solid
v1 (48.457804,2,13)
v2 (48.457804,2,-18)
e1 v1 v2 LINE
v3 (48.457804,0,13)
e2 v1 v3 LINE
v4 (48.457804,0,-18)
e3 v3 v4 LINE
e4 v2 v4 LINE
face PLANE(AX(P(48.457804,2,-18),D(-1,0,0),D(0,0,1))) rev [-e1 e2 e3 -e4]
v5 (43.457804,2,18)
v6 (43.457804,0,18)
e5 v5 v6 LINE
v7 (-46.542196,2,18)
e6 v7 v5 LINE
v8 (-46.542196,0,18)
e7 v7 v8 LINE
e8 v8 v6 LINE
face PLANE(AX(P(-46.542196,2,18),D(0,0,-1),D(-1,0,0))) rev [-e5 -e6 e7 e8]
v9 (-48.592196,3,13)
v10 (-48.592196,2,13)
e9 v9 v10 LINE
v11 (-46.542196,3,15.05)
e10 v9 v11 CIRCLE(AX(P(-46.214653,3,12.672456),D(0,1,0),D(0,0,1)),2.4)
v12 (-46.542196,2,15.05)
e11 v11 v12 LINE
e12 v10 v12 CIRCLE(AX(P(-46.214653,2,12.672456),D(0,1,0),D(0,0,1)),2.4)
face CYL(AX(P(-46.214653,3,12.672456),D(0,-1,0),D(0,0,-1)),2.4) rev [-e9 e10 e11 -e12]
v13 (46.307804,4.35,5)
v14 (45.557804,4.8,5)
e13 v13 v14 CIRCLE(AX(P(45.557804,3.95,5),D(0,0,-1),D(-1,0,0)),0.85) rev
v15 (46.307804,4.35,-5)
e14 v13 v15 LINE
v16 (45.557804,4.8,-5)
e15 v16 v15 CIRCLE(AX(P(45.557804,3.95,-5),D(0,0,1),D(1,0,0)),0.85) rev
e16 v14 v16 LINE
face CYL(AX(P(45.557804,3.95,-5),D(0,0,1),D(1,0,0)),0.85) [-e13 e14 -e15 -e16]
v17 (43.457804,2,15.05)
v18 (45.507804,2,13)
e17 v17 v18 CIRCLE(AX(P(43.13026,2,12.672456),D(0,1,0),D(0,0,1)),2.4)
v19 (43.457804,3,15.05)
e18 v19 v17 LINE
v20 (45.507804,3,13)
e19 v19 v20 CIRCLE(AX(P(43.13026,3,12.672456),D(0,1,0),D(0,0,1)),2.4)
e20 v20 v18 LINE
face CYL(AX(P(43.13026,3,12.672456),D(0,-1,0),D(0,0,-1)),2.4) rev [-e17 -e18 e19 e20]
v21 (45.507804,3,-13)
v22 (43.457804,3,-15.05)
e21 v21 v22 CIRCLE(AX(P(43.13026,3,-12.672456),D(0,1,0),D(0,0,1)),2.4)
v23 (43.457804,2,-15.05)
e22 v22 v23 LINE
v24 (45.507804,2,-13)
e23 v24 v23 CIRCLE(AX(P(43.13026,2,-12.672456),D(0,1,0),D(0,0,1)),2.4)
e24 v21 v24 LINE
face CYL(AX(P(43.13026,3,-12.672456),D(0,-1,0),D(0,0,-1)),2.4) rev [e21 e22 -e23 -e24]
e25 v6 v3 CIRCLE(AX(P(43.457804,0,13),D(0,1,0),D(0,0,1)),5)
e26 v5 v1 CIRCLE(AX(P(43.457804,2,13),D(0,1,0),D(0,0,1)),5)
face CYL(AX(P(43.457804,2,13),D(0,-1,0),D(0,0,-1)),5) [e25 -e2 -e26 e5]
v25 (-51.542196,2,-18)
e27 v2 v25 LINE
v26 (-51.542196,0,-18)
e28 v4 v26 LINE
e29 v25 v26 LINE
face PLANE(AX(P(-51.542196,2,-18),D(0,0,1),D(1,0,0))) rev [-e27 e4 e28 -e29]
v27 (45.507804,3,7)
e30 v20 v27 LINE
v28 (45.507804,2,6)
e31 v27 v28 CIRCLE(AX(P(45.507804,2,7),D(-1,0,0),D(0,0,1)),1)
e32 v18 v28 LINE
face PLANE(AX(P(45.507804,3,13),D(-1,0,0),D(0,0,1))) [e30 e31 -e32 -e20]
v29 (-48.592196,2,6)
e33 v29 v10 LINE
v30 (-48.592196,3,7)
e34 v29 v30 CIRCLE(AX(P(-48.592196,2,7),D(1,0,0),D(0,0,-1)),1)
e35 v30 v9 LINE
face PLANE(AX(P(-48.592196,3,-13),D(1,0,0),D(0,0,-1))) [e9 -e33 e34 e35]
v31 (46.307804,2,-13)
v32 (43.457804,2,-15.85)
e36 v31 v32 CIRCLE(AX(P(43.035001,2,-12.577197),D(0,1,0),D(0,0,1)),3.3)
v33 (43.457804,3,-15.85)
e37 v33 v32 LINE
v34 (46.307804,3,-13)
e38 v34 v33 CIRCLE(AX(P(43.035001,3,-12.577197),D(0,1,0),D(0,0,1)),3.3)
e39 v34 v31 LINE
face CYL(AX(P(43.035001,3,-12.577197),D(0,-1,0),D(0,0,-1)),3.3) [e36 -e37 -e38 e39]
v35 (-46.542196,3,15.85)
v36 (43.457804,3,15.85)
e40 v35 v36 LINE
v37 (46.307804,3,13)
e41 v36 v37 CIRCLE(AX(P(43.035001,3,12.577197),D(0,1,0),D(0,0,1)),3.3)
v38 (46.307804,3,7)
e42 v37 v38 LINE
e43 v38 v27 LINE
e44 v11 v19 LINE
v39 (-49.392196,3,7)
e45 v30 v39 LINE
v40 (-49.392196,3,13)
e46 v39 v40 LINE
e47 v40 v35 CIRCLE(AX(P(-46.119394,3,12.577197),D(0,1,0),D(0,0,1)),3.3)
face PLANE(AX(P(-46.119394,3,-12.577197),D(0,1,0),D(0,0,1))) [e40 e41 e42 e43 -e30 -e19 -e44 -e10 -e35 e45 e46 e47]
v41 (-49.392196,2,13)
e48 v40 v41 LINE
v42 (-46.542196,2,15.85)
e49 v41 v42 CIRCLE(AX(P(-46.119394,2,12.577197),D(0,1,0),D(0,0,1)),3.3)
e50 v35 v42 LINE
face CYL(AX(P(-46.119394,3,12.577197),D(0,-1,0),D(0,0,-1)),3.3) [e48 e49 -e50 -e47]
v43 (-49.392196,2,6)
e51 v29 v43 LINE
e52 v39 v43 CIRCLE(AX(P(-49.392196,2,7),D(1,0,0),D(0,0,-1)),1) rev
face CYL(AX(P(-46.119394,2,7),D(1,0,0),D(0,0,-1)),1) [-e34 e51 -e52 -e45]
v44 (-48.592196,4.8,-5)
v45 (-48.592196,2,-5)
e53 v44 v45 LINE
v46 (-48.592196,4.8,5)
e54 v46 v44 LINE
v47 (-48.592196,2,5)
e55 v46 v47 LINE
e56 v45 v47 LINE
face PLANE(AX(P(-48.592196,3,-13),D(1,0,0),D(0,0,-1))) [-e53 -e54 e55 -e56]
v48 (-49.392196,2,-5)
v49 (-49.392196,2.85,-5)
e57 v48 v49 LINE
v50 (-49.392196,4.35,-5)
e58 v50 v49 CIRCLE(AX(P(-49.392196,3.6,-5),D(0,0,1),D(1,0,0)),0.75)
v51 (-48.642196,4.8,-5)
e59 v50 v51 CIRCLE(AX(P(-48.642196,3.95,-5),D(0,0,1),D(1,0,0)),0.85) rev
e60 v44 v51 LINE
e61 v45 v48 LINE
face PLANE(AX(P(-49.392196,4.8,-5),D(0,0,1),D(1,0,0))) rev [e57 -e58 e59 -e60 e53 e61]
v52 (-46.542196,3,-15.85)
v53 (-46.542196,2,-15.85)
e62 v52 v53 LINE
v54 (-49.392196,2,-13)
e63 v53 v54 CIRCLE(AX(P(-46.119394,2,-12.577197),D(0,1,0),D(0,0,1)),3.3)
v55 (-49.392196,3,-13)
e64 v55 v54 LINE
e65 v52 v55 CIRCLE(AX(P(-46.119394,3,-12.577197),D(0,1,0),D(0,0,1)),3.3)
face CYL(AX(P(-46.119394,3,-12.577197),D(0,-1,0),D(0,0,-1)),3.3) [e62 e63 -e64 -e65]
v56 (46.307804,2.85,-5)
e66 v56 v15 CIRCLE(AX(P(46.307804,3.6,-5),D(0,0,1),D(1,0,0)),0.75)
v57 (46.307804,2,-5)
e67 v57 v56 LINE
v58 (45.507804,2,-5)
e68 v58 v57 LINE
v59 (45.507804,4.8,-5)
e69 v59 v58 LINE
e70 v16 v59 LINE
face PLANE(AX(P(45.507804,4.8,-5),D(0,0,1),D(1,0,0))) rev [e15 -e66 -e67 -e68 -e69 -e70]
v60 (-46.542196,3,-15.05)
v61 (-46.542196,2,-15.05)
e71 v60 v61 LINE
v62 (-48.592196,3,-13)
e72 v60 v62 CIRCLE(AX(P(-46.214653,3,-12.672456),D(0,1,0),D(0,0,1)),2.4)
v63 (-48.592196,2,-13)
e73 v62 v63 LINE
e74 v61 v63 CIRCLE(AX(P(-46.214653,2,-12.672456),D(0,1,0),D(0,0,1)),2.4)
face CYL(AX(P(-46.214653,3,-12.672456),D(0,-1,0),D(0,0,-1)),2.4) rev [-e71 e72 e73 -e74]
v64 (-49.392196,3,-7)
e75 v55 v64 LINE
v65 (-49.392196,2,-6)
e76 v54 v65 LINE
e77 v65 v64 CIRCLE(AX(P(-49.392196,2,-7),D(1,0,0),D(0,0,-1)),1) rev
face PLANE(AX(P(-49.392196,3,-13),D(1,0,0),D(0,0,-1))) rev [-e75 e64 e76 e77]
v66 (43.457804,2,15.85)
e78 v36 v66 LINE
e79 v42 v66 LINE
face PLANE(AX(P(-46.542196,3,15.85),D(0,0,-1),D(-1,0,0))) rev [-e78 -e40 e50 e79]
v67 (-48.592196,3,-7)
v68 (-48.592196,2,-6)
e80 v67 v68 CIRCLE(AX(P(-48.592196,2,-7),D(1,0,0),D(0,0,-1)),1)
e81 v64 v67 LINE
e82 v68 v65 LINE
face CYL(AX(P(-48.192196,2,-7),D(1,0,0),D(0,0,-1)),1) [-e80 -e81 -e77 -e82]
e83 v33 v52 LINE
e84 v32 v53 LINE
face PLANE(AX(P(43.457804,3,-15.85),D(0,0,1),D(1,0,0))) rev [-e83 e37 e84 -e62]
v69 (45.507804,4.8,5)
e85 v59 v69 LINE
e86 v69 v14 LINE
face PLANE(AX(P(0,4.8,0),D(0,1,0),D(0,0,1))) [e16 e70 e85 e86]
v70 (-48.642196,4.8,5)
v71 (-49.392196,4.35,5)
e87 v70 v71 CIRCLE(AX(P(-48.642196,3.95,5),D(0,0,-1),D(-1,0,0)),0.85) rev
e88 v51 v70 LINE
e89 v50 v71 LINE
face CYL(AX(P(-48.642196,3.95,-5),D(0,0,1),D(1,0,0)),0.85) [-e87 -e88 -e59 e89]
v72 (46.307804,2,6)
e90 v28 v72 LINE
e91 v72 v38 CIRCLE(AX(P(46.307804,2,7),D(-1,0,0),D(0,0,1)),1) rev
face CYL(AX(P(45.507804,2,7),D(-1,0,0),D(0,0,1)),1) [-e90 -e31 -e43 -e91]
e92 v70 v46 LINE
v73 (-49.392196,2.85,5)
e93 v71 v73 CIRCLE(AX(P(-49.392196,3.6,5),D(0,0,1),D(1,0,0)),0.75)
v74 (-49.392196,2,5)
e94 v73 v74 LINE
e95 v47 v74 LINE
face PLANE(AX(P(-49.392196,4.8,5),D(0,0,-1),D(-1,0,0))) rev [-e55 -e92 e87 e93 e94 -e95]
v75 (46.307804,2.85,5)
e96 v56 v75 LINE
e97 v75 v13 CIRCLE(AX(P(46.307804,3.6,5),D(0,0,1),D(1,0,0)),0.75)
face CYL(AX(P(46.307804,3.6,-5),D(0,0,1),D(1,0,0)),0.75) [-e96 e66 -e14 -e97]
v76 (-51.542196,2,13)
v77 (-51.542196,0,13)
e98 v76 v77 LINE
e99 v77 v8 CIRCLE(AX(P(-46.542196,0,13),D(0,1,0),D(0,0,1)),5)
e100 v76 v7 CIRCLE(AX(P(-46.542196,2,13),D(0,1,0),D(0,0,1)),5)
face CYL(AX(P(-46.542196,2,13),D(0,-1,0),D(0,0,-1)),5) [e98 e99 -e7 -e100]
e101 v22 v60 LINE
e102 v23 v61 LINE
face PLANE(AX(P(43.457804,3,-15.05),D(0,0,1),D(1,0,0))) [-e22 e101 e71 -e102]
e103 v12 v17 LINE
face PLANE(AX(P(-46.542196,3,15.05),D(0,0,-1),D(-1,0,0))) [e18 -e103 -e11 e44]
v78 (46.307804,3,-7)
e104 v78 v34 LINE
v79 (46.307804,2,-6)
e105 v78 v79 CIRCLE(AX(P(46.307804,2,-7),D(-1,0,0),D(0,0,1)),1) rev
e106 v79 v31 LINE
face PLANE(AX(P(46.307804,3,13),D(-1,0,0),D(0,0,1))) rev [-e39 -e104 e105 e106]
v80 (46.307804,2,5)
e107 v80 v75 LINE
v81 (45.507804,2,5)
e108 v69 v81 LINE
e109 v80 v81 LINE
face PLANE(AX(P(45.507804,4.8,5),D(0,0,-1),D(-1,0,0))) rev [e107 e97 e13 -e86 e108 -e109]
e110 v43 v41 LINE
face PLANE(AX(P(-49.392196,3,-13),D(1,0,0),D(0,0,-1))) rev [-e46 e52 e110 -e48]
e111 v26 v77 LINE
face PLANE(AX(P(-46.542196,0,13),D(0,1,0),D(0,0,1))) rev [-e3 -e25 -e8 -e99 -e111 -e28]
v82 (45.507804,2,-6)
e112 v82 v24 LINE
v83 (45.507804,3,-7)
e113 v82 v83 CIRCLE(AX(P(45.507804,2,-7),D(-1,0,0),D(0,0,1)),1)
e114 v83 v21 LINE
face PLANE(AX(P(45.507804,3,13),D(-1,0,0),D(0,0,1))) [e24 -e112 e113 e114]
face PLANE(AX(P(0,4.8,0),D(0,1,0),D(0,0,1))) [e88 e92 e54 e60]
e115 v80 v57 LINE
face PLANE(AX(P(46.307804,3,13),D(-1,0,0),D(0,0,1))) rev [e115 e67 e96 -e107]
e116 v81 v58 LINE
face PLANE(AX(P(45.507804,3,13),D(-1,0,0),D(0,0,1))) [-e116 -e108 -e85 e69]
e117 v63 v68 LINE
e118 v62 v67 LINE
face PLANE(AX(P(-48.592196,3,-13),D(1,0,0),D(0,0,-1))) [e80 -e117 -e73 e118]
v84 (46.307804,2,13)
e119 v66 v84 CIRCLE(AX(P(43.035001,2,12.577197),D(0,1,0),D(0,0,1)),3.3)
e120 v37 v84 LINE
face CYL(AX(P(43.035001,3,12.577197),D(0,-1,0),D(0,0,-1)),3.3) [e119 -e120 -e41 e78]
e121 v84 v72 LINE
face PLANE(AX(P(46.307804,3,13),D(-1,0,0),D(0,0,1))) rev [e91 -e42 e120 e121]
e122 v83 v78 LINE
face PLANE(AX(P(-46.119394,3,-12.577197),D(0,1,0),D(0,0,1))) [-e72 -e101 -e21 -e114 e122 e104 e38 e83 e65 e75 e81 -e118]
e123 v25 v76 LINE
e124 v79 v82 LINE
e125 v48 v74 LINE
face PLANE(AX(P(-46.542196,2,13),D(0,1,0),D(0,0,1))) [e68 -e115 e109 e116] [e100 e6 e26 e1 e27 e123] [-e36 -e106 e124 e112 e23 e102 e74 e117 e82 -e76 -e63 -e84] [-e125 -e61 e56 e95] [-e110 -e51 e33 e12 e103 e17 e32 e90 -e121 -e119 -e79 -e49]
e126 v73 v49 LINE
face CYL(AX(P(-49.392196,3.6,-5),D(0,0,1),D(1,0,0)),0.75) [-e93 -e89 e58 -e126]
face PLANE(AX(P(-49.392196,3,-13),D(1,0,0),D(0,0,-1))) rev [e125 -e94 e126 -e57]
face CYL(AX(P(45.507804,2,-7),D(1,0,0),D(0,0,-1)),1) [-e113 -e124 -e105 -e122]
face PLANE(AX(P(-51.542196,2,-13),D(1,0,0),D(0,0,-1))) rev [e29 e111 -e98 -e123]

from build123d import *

# Parameters (mm, degrees)
EXTRUDE_2_DEPTH     = 2
EXTRUDE_4_DEPTH     = 1
SKETCH_7_W          = 0.8
SKETCH_7_H          = 10
EXTRUDE_8_DEPTH     = 2.8
SKETCH_8_R          = 0.75
EXTRUDE_9_DEPTH     = 10
FILLET_1_R          = 0.85
SKETCH_11_W         = 1
SKETCH_11_H         = 1
CUT_EXTRUDE_1_DEPTH = 1.2
FILLET_2_R          = 1
SKETCH_13_W         = 0.8
SKETCH_13_H         = 10
EXTRUDE_10_DEPTH    = 1.8
SKETCH_14_R         = 0.75
EXTRUDE_11_DEPTH    = 10
FILLET_3_R          = 0.85
SKETCH_15_W         = 0.8
SKETCH_15_H         = 1
CUT_EXTRUDE_3_DEPTH = 1
FILLET_4_R          = 1


# Some blends are built 0.0001 mm under size
with BuildPart() as part:
    # case 2 → 凸台-拉伸2 (new body)
    with BuildSketch(Plane(origin=(0, 0, 0), x_dir=(1, 0, 0), z_dir=(0, 1, 0))):
        with BuildLine():
            Line((-51.542196447, 13), (-51.542196447, 18))
            Line((-51.542196447, 18), (-46.542196447, 18))
            Line((-46.542196447, 18), (43.457803553, 18))
            Line((43.457803553, 18), (48.457803553, 18))
            Line((48.457803553, 18), (48.457803553, 13))
            Line((48.457803553, 13), (48.457803553, -13))
            ThreePointArc((48.457803553, -13), (46.993337459, -16.535533906), (43.457803553, -18))
            Line((43.457803553, -18), (-46.542196447, -18))
            ThreePointArc((-46.542196447, -18), (-50.077730353, -16.535533906), (-51.542196447, -13))
            Line((-51.542196447, -13), (-51.542196447, 13))
        make_face()
    extrude(amount=EXTRUDE_2_DEPTH)

    # 草图3 → 凸台-拉伸4 (add)
    with BuildSketch(Plane(origin=(0, 2, 0), x_dir=(1, 0, 0), z_dir=(0, 1, 0))):
        with BuildLine():
            Line((-49.392196447, 13), (-49.392196447, -13))
            ThreePointArc((-49.392196447, -13), (-48.452846076, -14.910649629), (-46.542196447, -15.85))
            Line((-46.542196447, -15.85), (43.457803553, -15.85))
            ThreePointArc((43.457803553, -15.85), (45.368453181, -14.910649629), (46.307803553, -13))
            Line((46.307803553, -13), (46.307803553, 13))
            ThreePointArc((46.307803553, 13), (45.368453181, 14.910649629), (43.457803553, 15.85))
            Line((43.457803553, 15.85), (-46.542196447, 15.85))
            ThreePointArc((-46.542196447, 15.85), (-48.452846076, 14.910649629), (-49.392196447, 13))
        make_face()
        with BuildLine():
            Line((-46.542196447, -15.05), (43.457803553, -15.05))
            ThreePointArc((43.457803553, -15.05), (44.827315928, -14.369512375), (45.507803553, -13))
            Line((45.507803553, -13), (45.507803553, 13))
            ThreePointArc((45.507803553, 13), (44.827315928, 14.369512375), (43.457803553, 15.05))
            Line((43.457803553, 15.05), (-46.542196447, 15.05))
            ThreePointArc((-46.542196447, 15.05), (-47.911708823, 14.369512375), (-48.592196447, 13))
            Line((-48.592196447, 13), (-48.592196447, -13))
            ThreePointArc((-48.592196447, -13), (-47.911708823, -14.369512375), (-46.542196447, -15.05))
        make_face(mode=Mode.SUBTRACT)
    extrude(amount=EXTRUDE_4_DEPTH)

    # 草图7 → 凸台-拉伸8 (add)
    with BuildSketch(Plane(origin=(0, 2, 0), x_dir=(1, 0, 0), z_dir=(0, 1, 0))):
        with Locations((-48.992196447, 0)):
            Rectangle(SKETCH_7_W, SKETCH_7_H)
    extrude(amount=EXTRUDE_8_DEPTH)

    # 草图8 → 凸台-拉伸9 (add)
    with BuildSketch(Plane.XY.offset(5)):
        with Locations((-49.392196447, 3.6)):
            Circle(SKETCH_8_R)
    extrude(amount=-EXTRUDE_9_DEPTH)

    # 圆角1
    # the kernel refuses this fillet: 0.85 mm, written as the material it takes off along each edge
    with BuildSketch(Plane(origin=(-49.392196447, 4.8, 6.875), x_dir=(0, -1, 0), z_dir=(0, 0, -1))) as fillet_1_piece_1:
        with BuildLine():
            CenterArc((0.85, -0.75), FILLET_1_R, 118.072486936, 61.927513064)
            Line((0, -0.75), (-0.017, -0.75))
            Line((-0.017, -0.75), (-0.017, 0))
            Line((-0.017, 0), (0, 0.017))
            ThreePointArc((0, 0.017), (0.225, 0.017), (0.442, 0.015))
            Line((0.442, 0.015), (0.45, 0))
        make_face()
    extrude(amount=13.75, mode=Mode.SUBTRACT)

    # 草图11 → 切除-拉伸1 (cut)
    with BuildSketch(Plane.ZY.offset(49.392196447)):
        with Locations((5.5, 2.5)):
            Rectangle(SKETCH_11_W, SKETCH_11_H)
        with Locations((-5.5, 2.5)):
            Rectangle(SKETCH_11_W, SKETCH_11_H)
    extrude(amount=-CUT_EXTRUDE_1_DEPTH, mode=Mode.SUBTRACT)

    # 圆角2
    fillet_2_edges = [part.edges().sort_by_distance(p)[0] for p in [
        (-48.992196447, 3, 6),
        (-48.992196447, 3, -6),
    ]]
    fillet(fillet_2_edges, radius=FILLET_2_R - 0.0001)  # a hair under: the kernel refuses the full size

    # 草图13 → 凸台-拉伸10 (add)
    with BuildSketch(Plane(origin=(0, 3, 0), x_dir=(1, 0, 0), z_dir=(0, 1, 0))):
        with Locations((45.907803553, 0)):
            Rectangle(SKETCH_13_W, SKETCH_13_H)
    extrude(amount=EXTRUDE_10_DEPTH)

    # 草图14 → 凸台-拉伸11 (add)
    with BuildSketch(Plane.XY.offset(5)):
        with Locations((46.307803553, 3.6)):
            Circle(SKETCH_14_R)
    extrude(amount=-EXTRUDE_11_DEPTH)

    # 圆角3
    # the kernel refuses this fillet: 0.85 mm, written as the material it takes off along each edge
    with BuildSketch(Plane(origin=(46.307803553, 4.8, -6.875), x_dir=(0, -1, 0), z_dir=(0, 0, 1))) as fillet_3_piece_1:
        with BuildLine():
            CenterArc((0.85, -0.75), FILLET_3_R, 118.072486936, 61.927513064)
            Line((0, -0.75), (-0.017, -0.75))
            Line((-0.017, -0.75), (-0.017, 0))
            Line((-0.017, 0), (0, 0.017))
            ThreePointArc((0, 0.017), (0.225, 0.017), (0.442, 0.015))
            Line((0.442, 0.015), (0.45, 0))
        make_face()
    extrude(amount=13.75, mode=Mode.SUBTRACT)

    # 草图15 → 切除-拉伸3 (cut)
    with BuildSketch(Plane(origin=(0, 3, 0), x_dir=(1, 0, 0), z_dir=(0, 1, 0))):
        with Locations((45.907803553, 5.5)):
            Rectangle(SKETCH_15_W, SKETCH_15_H)
        with Locations((45.907803553, -5.5)):
            Rectangle(SKETCH_15_W, SKETCH_15_H)
    extrude(amount=-CUT_EXTRUDE_3_DEPTH, mode=Mode.SUBTRACT)

    # 圆角4
    fillet_4_edges = [part.edges().sort_by_distance(p)[0] for p in [
        (45.907803553, 3, 6),
        (45.907803553, 3, -6),
    ]]
    fillet(fillet_4_edges, radius=FILLET_4_R - 0.0001)  # a hair under: the kernel refuses the full size


solid = part.part
